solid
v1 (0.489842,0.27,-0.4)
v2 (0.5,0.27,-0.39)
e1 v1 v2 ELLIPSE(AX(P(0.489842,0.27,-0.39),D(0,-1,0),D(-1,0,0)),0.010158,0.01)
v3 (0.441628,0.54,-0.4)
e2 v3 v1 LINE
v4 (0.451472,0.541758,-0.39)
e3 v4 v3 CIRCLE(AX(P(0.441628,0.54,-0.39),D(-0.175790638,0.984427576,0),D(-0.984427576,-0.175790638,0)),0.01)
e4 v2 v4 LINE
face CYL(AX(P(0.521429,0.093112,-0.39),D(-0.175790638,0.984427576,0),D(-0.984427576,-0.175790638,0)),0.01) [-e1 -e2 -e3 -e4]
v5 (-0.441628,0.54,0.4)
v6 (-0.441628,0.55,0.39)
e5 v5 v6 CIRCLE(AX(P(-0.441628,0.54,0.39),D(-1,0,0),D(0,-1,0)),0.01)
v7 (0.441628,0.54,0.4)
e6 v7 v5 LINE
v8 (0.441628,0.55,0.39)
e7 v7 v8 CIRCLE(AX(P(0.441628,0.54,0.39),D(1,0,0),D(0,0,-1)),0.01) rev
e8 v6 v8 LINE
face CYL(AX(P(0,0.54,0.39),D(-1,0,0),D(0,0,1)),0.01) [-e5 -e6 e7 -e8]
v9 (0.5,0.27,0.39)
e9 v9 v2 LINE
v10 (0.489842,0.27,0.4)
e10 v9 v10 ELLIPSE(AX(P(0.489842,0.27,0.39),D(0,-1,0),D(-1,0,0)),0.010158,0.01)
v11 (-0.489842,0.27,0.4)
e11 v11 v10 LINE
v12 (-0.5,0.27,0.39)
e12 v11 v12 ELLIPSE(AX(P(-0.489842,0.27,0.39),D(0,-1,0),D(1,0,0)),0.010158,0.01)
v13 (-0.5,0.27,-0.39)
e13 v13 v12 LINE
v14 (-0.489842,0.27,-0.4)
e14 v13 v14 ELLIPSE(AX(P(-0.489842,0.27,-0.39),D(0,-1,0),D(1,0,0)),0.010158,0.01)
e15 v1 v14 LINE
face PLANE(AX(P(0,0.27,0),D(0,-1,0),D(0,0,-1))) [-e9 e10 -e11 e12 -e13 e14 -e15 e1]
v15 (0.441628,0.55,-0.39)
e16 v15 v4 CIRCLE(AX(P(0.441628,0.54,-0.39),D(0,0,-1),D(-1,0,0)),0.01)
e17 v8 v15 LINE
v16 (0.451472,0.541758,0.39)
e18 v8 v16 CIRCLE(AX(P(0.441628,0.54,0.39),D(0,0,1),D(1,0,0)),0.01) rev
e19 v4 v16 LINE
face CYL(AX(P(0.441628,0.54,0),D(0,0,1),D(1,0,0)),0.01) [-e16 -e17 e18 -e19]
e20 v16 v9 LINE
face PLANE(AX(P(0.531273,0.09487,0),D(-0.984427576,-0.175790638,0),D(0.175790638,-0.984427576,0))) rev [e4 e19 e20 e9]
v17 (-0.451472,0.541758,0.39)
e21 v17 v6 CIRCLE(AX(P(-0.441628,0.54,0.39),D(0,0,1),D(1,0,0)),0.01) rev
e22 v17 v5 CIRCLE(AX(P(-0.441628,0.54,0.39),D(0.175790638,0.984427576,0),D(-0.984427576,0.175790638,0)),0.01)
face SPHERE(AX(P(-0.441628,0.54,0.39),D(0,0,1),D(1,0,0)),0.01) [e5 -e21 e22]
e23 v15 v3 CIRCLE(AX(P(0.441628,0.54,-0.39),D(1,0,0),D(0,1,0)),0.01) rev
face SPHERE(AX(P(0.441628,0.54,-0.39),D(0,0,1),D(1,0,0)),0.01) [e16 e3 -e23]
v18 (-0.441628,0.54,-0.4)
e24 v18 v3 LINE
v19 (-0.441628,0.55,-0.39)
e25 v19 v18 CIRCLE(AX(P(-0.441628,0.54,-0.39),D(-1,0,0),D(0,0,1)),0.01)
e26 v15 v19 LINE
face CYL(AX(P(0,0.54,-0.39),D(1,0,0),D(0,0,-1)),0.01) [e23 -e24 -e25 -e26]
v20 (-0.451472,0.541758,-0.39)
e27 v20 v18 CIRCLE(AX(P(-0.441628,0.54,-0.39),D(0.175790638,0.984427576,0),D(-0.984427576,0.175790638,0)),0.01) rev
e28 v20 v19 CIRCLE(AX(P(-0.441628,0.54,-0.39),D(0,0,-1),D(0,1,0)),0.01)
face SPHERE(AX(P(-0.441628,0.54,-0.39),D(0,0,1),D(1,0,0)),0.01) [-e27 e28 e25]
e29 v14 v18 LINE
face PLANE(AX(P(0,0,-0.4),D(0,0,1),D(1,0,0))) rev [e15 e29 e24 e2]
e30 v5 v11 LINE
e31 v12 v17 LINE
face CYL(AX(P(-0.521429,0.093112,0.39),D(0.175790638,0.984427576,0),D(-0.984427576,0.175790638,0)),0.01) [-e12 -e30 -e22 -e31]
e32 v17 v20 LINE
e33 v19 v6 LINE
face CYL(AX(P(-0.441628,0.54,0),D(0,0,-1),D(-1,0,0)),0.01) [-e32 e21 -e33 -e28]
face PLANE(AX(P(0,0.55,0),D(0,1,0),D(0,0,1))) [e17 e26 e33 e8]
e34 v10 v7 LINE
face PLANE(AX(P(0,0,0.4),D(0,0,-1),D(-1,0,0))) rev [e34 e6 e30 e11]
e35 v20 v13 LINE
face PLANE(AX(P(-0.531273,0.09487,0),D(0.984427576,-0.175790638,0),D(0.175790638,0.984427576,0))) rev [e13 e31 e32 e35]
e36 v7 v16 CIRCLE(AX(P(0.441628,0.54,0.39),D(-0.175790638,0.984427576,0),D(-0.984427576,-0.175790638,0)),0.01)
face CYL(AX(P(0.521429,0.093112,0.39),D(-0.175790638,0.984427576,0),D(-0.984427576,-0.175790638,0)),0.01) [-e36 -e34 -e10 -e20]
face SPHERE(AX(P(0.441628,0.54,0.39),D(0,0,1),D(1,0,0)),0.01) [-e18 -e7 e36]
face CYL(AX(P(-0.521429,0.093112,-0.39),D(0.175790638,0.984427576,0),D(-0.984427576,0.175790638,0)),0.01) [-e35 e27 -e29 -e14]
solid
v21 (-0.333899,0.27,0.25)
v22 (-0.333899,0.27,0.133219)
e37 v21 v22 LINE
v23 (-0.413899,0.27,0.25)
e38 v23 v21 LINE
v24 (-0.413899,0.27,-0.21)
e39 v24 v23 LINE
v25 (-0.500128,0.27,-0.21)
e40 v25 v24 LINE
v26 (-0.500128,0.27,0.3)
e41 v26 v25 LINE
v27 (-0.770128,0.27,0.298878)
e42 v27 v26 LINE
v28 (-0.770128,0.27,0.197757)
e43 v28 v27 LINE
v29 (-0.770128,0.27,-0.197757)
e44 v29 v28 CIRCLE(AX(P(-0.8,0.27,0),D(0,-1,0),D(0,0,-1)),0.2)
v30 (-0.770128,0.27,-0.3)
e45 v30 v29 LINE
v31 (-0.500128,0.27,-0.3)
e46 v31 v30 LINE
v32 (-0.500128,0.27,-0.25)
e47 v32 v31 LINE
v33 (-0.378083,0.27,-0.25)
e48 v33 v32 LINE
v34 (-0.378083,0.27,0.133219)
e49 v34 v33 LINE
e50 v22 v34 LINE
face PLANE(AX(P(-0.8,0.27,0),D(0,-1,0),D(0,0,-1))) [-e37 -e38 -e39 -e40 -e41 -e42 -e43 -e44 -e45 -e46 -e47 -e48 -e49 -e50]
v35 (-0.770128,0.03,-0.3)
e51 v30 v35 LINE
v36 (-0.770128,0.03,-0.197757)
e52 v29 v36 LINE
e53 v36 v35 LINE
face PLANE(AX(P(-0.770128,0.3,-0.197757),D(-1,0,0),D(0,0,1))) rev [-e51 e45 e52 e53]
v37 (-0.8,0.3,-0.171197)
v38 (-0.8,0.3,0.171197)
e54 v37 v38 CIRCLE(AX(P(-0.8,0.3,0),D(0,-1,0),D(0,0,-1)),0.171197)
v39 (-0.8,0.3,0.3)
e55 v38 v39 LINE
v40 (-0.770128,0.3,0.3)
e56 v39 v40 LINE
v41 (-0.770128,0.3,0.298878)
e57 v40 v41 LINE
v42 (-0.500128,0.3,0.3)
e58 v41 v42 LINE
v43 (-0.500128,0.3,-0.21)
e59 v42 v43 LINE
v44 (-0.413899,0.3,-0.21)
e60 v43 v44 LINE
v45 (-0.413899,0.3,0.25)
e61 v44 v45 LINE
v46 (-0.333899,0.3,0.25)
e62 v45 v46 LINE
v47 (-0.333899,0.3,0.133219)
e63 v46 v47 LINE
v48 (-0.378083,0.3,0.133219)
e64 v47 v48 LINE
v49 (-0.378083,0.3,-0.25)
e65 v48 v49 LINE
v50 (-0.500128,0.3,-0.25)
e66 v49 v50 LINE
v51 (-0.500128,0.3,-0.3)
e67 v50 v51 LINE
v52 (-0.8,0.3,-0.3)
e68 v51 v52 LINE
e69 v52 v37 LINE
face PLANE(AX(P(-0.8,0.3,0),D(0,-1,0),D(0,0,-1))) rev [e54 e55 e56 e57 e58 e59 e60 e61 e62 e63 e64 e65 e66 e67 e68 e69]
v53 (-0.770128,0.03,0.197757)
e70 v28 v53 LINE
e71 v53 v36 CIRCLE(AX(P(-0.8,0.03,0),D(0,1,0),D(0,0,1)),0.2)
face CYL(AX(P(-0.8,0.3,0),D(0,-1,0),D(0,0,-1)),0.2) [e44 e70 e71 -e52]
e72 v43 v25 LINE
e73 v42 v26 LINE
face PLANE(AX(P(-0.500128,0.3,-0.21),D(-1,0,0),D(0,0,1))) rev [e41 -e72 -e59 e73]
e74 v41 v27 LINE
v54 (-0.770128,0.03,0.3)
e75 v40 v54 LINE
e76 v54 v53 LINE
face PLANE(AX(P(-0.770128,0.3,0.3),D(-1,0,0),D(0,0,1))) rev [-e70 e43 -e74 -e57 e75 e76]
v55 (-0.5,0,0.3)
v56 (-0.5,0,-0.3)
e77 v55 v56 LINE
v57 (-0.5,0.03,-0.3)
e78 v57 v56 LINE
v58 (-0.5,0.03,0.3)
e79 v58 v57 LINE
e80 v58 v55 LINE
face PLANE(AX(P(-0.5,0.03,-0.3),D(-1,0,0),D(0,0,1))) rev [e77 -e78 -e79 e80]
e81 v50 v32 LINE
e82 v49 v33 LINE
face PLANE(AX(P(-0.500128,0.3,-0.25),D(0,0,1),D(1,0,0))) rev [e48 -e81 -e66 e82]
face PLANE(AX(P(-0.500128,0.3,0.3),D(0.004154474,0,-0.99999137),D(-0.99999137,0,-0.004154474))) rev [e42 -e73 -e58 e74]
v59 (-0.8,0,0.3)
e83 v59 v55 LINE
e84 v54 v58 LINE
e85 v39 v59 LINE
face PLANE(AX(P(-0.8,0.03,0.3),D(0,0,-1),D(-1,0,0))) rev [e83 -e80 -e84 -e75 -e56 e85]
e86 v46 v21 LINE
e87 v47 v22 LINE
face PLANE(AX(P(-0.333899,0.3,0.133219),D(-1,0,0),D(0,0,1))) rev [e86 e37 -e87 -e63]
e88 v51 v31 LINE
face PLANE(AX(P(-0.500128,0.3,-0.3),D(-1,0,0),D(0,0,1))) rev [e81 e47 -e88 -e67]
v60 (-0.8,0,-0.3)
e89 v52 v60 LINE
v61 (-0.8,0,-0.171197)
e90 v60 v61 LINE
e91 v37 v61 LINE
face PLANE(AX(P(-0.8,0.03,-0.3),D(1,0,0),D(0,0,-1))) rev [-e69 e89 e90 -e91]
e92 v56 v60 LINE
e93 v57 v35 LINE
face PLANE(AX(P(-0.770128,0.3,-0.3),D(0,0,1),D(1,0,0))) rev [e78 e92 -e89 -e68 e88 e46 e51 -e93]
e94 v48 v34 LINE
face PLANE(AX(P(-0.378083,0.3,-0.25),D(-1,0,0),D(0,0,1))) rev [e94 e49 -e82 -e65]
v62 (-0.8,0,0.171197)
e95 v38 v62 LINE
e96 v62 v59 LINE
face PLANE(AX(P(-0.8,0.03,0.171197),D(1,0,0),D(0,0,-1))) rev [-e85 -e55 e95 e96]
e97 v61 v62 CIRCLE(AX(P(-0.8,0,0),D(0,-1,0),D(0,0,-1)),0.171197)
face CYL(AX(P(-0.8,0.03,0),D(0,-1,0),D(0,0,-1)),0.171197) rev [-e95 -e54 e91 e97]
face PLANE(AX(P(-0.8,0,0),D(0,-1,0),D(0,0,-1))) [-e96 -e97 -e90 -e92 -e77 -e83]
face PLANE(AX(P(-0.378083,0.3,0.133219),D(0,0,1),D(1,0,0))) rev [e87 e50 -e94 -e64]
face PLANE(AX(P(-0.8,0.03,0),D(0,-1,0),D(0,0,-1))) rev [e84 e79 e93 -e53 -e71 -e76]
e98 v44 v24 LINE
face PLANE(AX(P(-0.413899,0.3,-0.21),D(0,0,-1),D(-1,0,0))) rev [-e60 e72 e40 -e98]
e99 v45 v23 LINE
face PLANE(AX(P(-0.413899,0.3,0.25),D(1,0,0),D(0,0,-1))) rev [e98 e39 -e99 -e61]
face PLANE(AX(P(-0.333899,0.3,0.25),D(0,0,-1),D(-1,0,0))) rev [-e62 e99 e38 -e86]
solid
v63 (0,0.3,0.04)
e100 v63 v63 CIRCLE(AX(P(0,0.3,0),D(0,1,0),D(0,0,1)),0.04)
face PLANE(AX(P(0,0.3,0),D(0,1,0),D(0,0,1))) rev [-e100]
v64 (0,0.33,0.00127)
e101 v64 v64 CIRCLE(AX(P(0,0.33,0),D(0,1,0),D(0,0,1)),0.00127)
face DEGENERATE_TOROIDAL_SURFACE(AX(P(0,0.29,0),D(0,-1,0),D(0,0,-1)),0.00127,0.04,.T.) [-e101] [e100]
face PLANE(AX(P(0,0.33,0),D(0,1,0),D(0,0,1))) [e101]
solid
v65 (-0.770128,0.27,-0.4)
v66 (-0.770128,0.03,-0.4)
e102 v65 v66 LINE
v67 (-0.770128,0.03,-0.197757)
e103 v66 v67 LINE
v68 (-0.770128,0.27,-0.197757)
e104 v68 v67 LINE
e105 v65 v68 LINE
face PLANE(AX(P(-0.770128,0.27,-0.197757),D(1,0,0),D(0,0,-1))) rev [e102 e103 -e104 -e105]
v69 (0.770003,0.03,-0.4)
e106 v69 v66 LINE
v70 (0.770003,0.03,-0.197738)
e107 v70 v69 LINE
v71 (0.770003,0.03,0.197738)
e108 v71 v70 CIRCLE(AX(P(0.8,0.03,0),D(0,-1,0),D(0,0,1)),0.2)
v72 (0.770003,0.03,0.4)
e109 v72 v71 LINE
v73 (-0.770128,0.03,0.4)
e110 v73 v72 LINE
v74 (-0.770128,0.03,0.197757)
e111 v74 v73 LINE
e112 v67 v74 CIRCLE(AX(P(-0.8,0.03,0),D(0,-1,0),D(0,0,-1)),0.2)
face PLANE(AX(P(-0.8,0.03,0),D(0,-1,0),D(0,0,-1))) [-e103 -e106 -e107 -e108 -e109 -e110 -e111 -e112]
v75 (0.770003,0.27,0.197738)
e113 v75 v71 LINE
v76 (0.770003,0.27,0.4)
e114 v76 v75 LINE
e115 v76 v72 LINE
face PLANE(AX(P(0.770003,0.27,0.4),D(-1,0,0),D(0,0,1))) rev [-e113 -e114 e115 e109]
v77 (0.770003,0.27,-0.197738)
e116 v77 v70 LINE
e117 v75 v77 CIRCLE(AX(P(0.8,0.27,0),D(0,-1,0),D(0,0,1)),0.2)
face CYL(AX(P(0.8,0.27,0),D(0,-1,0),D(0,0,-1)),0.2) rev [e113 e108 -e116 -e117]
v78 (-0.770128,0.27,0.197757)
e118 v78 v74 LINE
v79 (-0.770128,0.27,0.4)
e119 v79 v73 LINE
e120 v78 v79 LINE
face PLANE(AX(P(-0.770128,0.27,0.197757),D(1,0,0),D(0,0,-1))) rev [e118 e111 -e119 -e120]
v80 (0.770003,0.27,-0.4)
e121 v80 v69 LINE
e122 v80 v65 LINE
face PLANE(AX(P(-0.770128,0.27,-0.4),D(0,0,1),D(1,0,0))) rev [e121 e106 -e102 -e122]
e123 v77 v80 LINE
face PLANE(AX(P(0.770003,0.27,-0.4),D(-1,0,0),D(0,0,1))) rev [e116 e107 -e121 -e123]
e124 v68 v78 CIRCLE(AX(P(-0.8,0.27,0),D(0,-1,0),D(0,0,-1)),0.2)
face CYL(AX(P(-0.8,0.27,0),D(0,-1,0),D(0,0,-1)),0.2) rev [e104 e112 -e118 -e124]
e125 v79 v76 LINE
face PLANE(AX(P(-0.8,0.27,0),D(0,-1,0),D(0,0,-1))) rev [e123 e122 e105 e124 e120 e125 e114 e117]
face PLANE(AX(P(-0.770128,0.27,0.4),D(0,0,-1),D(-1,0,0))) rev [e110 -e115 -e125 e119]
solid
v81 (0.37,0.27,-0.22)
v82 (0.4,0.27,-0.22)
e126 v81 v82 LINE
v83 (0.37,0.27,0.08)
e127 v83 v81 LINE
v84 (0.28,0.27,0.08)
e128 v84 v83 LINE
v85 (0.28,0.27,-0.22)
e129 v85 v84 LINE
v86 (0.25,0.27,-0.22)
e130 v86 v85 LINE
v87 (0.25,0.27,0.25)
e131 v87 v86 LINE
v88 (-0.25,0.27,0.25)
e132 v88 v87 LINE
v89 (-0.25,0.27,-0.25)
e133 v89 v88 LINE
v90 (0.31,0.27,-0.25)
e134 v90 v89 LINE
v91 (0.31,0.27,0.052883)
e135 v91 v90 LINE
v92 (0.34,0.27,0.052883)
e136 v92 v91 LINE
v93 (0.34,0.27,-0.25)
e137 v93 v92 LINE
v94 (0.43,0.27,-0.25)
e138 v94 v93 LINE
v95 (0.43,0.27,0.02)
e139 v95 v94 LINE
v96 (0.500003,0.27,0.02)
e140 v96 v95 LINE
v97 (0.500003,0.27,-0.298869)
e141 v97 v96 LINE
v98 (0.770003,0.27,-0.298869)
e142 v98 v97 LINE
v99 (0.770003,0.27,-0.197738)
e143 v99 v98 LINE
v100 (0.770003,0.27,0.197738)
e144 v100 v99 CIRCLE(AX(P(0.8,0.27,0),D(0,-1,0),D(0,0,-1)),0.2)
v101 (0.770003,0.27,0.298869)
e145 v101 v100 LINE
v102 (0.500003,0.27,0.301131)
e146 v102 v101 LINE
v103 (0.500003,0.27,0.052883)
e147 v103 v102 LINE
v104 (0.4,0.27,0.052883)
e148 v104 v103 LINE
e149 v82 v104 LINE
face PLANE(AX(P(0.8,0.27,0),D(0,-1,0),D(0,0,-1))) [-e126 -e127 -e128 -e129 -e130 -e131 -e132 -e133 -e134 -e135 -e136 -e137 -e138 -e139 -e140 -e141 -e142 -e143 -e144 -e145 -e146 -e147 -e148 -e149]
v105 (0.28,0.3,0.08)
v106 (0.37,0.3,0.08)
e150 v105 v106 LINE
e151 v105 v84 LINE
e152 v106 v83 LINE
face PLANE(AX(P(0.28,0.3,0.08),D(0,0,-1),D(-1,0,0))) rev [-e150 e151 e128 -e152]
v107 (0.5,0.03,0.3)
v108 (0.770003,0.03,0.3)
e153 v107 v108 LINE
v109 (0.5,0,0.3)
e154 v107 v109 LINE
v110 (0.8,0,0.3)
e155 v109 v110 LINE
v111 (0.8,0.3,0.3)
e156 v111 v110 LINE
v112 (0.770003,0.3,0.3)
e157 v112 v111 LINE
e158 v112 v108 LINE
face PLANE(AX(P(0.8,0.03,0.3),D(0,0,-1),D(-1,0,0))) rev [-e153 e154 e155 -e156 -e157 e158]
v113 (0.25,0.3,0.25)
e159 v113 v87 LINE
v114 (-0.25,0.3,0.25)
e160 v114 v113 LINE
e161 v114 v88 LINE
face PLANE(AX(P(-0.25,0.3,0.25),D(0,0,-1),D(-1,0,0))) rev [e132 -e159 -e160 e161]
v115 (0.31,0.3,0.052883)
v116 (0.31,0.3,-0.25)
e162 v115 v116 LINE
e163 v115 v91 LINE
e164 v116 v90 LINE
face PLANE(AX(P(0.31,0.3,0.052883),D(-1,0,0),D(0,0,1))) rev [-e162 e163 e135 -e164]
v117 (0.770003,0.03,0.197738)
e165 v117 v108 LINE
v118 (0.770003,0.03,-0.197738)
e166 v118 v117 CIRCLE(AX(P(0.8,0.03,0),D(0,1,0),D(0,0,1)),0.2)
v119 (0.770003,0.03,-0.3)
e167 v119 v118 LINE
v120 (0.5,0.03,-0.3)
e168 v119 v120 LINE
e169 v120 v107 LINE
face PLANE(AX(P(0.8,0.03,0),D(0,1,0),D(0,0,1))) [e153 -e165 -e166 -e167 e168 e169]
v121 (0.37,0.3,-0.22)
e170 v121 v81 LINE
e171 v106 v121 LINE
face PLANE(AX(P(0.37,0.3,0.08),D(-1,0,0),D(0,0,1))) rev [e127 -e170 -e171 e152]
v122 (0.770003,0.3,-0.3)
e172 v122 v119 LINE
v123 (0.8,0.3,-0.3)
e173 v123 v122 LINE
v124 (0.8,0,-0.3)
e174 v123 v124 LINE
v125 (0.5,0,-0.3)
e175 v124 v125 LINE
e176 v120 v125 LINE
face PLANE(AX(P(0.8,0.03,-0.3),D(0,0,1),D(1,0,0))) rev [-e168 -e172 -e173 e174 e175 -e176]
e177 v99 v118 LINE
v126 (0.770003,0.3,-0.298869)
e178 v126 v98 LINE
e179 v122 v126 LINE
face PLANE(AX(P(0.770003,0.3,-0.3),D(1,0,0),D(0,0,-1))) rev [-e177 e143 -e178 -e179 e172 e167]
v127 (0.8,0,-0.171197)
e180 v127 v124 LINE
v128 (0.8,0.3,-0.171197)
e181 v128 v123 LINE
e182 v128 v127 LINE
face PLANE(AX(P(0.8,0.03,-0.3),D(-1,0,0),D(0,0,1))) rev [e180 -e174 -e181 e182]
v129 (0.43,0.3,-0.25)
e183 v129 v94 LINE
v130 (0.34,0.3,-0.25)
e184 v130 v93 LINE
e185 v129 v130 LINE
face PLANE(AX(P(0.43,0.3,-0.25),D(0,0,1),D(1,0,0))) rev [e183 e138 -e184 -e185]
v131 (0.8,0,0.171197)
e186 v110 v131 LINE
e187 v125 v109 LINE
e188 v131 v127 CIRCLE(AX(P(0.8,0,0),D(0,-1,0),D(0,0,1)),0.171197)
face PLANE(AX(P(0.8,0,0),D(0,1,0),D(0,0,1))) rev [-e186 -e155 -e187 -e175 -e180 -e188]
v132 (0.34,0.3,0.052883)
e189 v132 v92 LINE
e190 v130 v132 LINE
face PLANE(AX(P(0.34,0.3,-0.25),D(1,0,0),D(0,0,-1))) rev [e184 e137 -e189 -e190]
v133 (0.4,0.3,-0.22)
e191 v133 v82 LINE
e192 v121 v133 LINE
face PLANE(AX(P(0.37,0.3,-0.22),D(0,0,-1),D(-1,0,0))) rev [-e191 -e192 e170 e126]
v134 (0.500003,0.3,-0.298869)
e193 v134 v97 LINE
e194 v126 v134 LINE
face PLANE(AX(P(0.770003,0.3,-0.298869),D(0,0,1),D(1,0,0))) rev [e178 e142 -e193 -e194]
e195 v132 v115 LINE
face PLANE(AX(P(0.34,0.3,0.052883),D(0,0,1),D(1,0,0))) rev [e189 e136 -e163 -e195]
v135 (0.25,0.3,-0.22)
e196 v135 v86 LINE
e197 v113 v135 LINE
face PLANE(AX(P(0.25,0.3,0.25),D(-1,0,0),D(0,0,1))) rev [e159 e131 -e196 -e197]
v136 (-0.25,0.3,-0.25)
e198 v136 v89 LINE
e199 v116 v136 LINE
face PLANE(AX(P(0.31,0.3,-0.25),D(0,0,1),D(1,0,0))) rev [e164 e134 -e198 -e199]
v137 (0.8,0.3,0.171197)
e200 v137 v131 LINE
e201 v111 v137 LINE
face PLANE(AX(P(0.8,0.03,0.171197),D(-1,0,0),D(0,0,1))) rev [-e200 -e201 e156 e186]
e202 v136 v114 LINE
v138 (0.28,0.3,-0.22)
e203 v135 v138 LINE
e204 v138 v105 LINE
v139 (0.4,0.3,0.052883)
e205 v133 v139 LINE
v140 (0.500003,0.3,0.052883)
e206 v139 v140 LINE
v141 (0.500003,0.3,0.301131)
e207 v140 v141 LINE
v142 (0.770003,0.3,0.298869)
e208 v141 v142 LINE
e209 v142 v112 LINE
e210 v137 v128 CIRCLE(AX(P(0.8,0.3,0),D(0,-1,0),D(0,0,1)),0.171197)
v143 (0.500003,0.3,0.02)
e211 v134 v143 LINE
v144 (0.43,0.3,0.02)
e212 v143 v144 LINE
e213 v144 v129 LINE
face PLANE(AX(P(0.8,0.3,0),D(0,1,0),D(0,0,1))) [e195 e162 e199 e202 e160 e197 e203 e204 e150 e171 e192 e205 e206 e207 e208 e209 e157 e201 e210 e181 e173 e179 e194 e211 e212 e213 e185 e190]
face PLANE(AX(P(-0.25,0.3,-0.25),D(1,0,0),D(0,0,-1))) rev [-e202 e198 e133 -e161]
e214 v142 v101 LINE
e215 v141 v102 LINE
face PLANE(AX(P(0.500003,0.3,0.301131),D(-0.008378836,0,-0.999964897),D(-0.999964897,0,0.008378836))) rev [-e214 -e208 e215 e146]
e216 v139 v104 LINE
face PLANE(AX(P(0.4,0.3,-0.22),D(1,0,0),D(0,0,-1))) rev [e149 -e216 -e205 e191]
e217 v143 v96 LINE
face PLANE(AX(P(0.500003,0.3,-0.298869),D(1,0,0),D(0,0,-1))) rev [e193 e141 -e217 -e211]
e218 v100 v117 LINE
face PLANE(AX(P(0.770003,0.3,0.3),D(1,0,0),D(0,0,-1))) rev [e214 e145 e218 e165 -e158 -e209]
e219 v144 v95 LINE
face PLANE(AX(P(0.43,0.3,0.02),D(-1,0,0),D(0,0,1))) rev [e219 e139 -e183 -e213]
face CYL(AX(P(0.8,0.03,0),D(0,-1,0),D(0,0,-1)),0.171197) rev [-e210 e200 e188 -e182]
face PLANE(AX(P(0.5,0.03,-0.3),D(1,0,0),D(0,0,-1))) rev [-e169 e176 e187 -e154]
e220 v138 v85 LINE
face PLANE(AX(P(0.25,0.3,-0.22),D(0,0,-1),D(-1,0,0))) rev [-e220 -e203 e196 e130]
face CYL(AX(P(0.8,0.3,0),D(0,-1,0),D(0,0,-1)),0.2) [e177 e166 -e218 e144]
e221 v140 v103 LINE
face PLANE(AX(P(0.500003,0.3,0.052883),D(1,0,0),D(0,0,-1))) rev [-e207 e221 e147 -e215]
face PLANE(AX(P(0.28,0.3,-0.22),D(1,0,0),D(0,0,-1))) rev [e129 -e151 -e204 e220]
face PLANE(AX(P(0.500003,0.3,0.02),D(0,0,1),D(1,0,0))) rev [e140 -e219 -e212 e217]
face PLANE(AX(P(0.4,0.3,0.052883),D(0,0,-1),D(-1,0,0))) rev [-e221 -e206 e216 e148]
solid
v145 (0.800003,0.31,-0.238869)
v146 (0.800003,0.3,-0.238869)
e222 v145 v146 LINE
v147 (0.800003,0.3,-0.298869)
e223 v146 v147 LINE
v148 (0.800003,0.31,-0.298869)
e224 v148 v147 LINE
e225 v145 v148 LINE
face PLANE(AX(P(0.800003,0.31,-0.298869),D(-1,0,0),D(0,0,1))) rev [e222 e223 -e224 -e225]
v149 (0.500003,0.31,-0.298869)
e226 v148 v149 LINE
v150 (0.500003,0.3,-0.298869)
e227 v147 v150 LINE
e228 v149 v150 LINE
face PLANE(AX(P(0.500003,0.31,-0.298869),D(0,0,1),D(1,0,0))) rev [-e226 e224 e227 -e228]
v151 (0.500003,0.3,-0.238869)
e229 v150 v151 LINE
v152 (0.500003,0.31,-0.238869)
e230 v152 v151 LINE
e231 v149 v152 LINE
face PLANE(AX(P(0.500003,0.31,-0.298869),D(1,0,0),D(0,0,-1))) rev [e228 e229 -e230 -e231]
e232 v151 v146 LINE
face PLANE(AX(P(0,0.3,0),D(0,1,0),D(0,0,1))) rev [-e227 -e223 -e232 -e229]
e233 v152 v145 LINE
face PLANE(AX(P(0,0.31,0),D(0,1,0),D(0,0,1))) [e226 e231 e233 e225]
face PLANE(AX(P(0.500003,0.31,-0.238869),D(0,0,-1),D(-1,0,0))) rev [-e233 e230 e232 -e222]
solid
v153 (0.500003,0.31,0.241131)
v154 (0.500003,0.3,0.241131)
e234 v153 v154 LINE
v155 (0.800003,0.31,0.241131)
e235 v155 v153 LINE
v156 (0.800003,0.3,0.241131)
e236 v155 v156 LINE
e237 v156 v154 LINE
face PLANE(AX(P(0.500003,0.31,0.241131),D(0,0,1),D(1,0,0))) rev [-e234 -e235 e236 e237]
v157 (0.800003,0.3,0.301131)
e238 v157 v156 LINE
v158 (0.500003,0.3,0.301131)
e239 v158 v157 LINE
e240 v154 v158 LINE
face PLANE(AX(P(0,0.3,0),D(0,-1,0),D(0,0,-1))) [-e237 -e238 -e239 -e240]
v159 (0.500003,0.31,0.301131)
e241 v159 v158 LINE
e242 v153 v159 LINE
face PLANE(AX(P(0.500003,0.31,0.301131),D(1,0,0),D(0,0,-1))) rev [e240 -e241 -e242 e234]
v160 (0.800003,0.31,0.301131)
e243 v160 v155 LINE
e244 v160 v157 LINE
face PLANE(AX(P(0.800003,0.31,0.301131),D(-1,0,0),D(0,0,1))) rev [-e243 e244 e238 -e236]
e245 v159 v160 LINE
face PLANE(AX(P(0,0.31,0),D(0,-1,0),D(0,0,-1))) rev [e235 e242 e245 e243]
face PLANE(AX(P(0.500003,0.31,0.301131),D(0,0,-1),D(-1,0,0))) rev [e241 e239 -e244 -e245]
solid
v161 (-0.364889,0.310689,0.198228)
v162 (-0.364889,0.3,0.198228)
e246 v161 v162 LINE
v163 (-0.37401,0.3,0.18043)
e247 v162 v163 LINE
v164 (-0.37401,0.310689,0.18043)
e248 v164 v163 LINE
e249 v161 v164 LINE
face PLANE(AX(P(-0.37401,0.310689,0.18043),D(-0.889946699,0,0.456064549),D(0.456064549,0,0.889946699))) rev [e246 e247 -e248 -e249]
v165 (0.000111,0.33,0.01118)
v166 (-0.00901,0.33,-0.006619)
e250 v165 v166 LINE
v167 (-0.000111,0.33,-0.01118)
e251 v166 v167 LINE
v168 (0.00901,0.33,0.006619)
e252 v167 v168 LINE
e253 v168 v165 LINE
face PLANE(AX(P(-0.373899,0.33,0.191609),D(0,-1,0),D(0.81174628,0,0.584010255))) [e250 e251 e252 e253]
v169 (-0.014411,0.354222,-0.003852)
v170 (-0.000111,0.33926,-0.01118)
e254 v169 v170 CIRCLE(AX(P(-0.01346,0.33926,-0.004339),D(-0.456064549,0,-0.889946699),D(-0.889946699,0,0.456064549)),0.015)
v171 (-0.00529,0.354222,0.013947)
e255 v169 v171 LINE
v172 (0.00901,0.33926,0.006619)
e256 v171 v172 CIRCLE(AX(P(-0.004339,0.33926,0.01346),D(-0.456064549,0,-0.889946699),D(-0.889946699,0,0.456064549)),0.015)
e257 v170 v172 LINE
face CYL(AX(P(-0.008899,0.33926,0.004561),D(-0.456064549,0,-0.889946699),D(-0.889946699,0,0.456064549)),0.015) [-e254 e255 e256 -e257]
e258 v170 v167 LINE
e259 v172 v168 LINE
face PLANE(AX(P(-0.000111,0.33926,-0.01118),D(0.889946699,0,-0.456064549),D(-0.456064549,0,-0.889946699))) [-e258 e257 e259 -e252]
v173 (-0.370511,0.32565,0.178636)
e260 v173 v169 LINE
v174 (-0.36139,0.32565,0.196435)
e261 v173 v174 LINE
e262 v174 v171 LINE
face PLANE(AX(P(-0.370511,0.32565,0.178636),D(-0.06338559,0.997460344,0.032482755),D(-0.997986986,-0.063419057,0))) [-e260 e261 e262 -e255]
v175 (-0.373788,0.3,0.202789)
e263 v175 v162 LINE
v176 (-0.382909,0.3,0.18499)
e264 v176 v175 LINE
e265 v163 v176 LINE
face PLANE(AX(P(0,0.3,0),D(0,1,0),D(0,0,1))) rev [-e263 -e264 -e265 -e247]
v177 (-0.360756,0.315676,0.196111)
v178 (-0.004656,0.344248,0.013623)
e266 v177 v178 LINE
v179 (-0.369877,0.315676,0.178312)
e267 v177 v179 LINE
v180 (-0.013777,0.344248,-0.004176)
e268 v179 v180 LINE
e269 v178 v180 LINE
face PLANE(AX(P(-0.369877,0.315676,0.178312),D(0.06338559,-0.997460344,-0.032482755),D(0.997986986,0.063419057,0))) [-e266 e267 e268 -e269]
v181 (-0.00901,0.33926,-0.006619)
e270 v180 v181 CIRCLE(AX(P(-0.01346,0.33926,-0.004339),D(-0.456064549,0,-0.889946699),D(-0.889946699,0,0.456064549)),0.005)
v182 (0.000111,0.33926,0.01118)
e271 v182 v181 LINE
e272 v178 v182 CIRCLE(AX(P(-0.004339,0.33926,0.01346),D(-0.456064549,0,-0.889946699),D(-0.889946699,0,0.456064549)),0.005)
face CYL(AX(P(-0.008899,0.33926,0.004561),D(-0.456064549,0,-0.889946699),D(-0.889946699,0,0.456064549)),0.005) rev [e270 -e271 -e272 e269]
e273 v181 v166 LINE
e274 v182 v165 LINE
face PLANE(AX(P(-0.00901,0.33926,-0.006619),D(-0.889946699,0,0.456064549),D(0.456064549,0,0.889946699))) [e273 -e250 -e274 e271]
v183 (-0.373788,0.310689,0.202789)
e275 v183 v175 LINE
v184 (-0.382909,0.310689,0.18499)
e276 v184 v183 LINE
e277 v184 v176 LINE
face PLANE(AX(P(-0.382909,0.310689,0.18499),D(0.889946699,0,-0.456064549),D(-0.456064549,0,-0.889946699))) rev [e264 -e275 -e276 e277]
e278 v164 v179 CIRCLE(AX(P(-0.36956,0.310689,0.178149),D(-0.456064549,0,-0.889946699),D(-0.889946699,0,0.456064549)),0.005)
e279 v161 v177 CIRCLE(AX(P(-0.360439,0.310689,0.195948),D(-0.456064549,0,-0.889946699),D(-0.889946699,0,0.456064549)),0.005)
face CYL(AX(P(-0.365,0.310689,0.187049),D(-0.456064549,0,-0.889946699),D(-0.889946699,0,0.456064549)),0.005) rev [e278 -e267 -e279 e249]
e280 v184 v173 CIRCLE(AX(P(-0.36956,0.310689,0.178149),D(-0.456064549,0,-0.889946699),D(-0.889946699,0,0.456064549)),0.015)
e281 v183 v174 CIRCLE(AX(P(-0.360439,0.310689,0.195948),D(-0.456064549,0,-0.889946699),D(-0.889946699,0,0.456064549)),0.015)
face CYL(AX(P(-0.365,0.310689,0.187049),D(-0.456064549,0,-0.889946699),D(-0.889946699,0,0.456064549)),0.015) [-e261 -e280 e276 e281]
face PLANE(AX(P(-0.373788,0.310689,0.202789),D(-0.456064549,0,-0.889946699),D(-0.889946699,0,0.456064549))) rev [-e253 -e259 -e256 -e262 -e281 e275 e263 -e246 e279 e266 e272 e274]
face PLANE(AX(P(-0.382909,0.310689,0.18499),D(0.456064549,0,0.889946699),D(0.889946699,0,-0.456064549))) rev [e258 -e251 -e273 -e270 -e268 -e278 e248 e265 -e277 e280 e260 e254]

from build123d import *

# Parameters (mm, degrees)
EXTRUDE_1_DEPTH   = 0.03
EXTRUDE_1_2_DEPTH = 0.03
EXTRUDE_2_DEPTH   = 0.27
EXTRUDE_3_DEPTH   = 0.24
EXTRUDE_4_DEPTH   = 0.03
EXTRUDE_4_2_DEPTH = 0.03
SKETCH_9_R        = 0.04
EXTRUDE_5_DEPTH   = 0.03
FILLET_1_R        = 0.04
FILLET_2_R        = 0.01
SKETCH_18_W       = 0.3
SKETCH_18_H       = 0.06
EXTRUDE_8_DEPTH   = 0.01
EXTRUDE_8_2_DEPTH = 0.01


with BuildPart() as part:
    # Эскиз1 → Бобышка-Вытянуть1 (new body)
    with BuildSketch(Plane(origin=(0, 0, 0), x_dir=(1, 0, 0), z_dir=(0, 1, 0))):
        with BuildLine():
            Line((-0.8, 0.3), (-0.8, 0.171196845))
            ThreePointArc((-0.8, 0.171196845), (-0.628803155, 0), (-0.8, -0.171196845))
            Line((-0.8, -0.171196845), (-0.8, -0.3))
            Line((-0.8, -0.3), (-0.5, -0.3))
            Line((-0.5, -0.3), (-0.5, 0.3))
            Line((-0.5, 0.3), (-0.8, 0.3))
        make_face()
    extrude(amount=EXTRUDE_1_DEPTH)



with BuildPart() as body_2:
    # Эскиз1 → Extrude 1 2 (new body)
    with BuildSketch(Plane(origin=(0, 0, 0), x_dir=(1, 0, 0), z_dir=(0, 1, 0))):
        with BuildLine():
            Line((0.8, 0.3), (0.5, 0.3))
            Line((0.5, 0.3), (0.5, -0.3))
            Line((0.5, -0.3), (0.8, -0.3))
            Line((0.8, -0.3), (0.8, -0.171196845))
            ThreePointArc((0.8, -0.171196845), (0.628803155, 0), (0.8, 0.171196845))
            Line((0.8, 0.171196845), (0.8, 0.3))
        make_face()
    extrude(amount=EXTRUDE_1_2_DEPTH)


with BuildPart() as part_1:
    add(part.part)

    add(body_2.part)  # Бобышка-Вытянуть2 merges body 2
    # Эскиз2 → Бобышка-Вытянуть2 (add)
    with BuildSketch(Plane(origin=(0, 0.03, 0), x_dir=(1, 0, 0), z_dir=(0, 1, 0))):
        with BuildLine():
            Line((-0.8, 0.171196845), (-0.8, 0.3))
            Line((-0.8, 0.3), (-0.770127922, 0.3))
            Line((-0.770127922, 0.3), (-0.770127922, 0.197756565))
            ThreePointArc((-0.770127922, 0.197756565), (-0.6, 0), (-0.770127922, -0.197756565))
            Line((-0.770127922, -0.197756565), (-0.770127922, -0.3))
            Line((-0.770127922, -0.3), (-0.8, -0.3))
            Line((-0.8, -0.3), (-0.8, -0.171196845))
            ThreePointArc((-0.8, -0.171196845), (-0.628803155, 0), (-0.8, 0.171196845))
        make_face()
        with BuildLine():
            Line((0.8, 0.171196845), (0.8, 0.3))
            Line((0.8, 0.3), (0.770002872, 0.3))
            Line((0.770002872, 0.3), (0.770002872, 0.197737635))
            ThreePointArc((0.770002872, 0.197737635), (0.6, 0), (0.770002872, -0.197737635))
            Line((0.770002872, -0.197737635), (0.770002872, -0.3))
            Line((0.770002872, -0.3), (0.8, -0.3))
            Line((0.8, -0.3), (0.8, -0.171196845))
            ThreePointArc((0.8, -0.171196845), (0.628803155, 0), (0.8, 0.171196845))
        make_face()
    extrude(amount=EXTRUDE_2_DEPTH)


with BuildPart() as body_2_2:
    # Эскиз3 → Бобышка-Вытянуть3 (new body)
    with BuildSketch(Plane(origin=(0, 0.03, 0), x_dir=(1, 0, 0), z_dir=(0, 1, 0))):
        with BuildLine():
            Line((-0.770127922, 0.197756565), (-0.770127922, 0.4))
            Line((-0.770127922, 0.4), (0.770002872, 0.4))
            Line((0.770002872, 0.4), (0.770002872, 0.197737635))
            ThreePointArc((0.770002872, 0.197737635), (0.6, 0), (0.770002872, -0.197737635))
            Line((0.770002872, -0.197737635), (0.770002872, -0.4))
            Line((0.770002872, -0.4), (-0.770127922, -0.4))
            Line((-0.770127922, -0.4), (-0.770127922, -0.197756565))
            ThreePointArc((-0.770127922, -0.197756565), (-0.6, 0), (-0.770127922, 0.197756565))
        make_face()
    extrude(amount=EXTRUDE_3_DEPTH)


with BuildPart() as body_3:
    # Эскиз4 → Бобышка-Вытянуть4 (new body)
    with BuildSketch(Plane(origin=(0, 0.27, 0), x_dir=(1, 0, 0), z_dir=(0, 1, 0))):
        with BuildLine():
            Line((-0.770127922, 0.197756565), (-0.770127922, 0.3))
            Line((-0.770127922, 0.3), (-0.500127922, 0.3))
            Line((-0.500127922, 0.3), (-0.500127922, 0.25))
            Line((-0.500127922, 0.25), (-0.378083422, 0.25))
            Line((-0.378083422, 0.25), (-0.378083422, -0.133218672))
            Line((-0.378083422, -0.133218672), (-0.333899038, -0.133218672))
            Line((-0.333899038, -0.133218672), (-0.333899038, -0.25))
            Line((-0.333899038, -0.25), (-0.413899038, -0.25))
            Line((-0.413899038, -0.25), (-0.413899038, 0.21))
            Line((-0.413899038, 0.21), (-0.500127922, 0.21))
            Line((-0.500127922, 0.21), (-0.500127922, -0.3))
            Line((-0.500127922, -0.3), (-0.770127922, -0.298878282))
            Line((-0.770127922, -0.298878282), (-0.770127922, -0.197756565))
            ThreePointArc((-0.770127922, -0.197756565), (-0.6, 0), (-0.770127922, 0.197756565))
        make_face()
    extrude(amount=EXTRUDE_4_DEPTH)


with BuildPart() as body_4:
    # Эскиз4 → Extrude 4 2 (new body)
    with BuildSketch(Plane(origin=(0, 0.27, 0), x_dir=(1, 0, 0), z_dir=(0, 1, 0))):
        with BuildLine():
            Line((0.770002872, 0.197737635), (0.770002872, 0.298868817))
            Line((0.770002872, 0.298868817), (0.500002872, 0.298868817))
            Line((0.500002872, 0.298868817), (0.500002872, -0.02))
            Line((0.500002872, -0.02), (0.43, -0.02))
            Line((0.43, -0.02), (0.43, 0.25))
            Line((0.43, 0.25), (0.34, 0.25))
            Line((0.34, 0.25), (0.34, -0.052883428))
            Line((0.34, -0.052883428), (0.31, -0.052883428))
            Line((0.31, -0.052883428), (0.31, 0.25))
            Line((0.31, 0.25), (-0.25, 0.25))
            Line((-0.25, 0.25), (-0.25, -0.25))
            Line((-0.25, -0.25), (0.25, -0.25))
            Line((0.25, -0.25), (0.25, 0.22))
            Line((0.25, 0.22), (0.28, 0.22))
            Line((0.28, 0.22), (0.28, -0.08))
            Line((0.28, -0.08), (0.37, -0.08))
            Line((0.37, -0.08), (0.37, 0.22))
            Line((0.37, 0.22), (0.4, 0.22))
            Line((0.4, 0.22), (0.4, -0.052883428))
            Line((0.4, -0.052883428), (0.500002872, -0.052883428))
            Line((0.500002872, -0.052883428), (0.500002872, -0.301131183))
            Line((0.500002872, -0.301131183), (0.770002872, -0.298868817))
            Line((0.770002872, -0.298868817), (0.770002872, -0.197737635))
            ThreePointArc((0.770002872, -0.197737635), (0.6, 0), (0.770002872, 0.197737635))
        make_face()
    extrude(amount=EXTRUDE_4_2_DEPTH)


with BuildPart() as body_5:
    # Эскиз9 → Бобышка-Вытянуть5 (new body)
    with BuildSketch(Plane(origin=(0, 0.3, 0), x_dir=(1, 0, 0), z_dir=(0, 1, 0))):
        with Locations(Location((0, 0, 0), (0, 0, 270))):
            Circle(SKETCH_9_R)
    extrude(amount=EXTRUDE_5_DEPTH)

    # Скругление1
    # the kernel refuses this fillet: 0.04 mm, written as the material it takes off along each edge
    with BuildSketch(Plane(origin=(0, 0.33, 0), x_dir=(0, 0, 1), z_dir=(-1, 0, 0))) as fillet_1_piece_1:
        with BuildLine():
            CenterArc((0.001270167, -0.04), FILLET_1_R, 14.477512185, 75.522487815)
            Line((0.001270167, 0), (0.001270167, 0.0008))
            Line((0.001270167, 0.0008), (0.04, 0.0008))
            Line((0.04, 0.0008), (0.0408, 0))
            ThreePointArc((0.0408, 0), (0.0408, -0.015), (0.040774597, -0.0298))
            Line((0.040774597, -0.0298), (0.04, -0.03))
        make_face()
    revolve(axis=Axis((0, 0.33, 0), (0, 1, 0)), mode=Mode.SUBTRACT)


with BuildPart() as body_6:
    # По траектории1: sweep along a path in Эскиз11
    with BuildLine(Plane(origin=(0, 0, 0), x_dir=(-0.8899466991308816, 0, 0.4560645488371663), z_dir=(-0.4560645488371663, 0, -0.8899466991308816))) as sweep_1_path:
        Line((0.42013644, 0.3), (0.42013644, 0.310688593))
        ThreePointArc((0.42013644, 0.310688593), (0.417454992, 0.317503194), (0.41084868, 0.320663196))
        Line((0.41084868, 0.320663196), (0.01071224, 0.349235088))
        ThreePointArc((0.01071224, 0.349235088), (0.003185398, 0.346579037), (0, 0.339260485))
        Line((0, 0.339260485), (0, 0.33))
    # Эскиз14 → По траектории1 (sweep)
    with BuildSketch(Plane(origin=(0, 0.3, 0), x_dir=(1, 0, 0), z_dir=(0, 1, 0))):
        Polygon((-0.382909417, -0.184990192), (-0.37400995, -0.180429546), (-0.364888659, -0.19822848), (-0.373788126, -0.202789126), align=None)
    sweep(path=sweep_1_path.line)


with BuildPart() as body_7:
    # Эскиз5 → По сечениям1 section 0
    with BuildSketch(Plane(origin=(0, 0.27, 0), x_dir=(1, 0, 0), z_dir=(0, 1, 0))):
        with BuildLine():
            Line((-0.5, -0.4), (0.5, -0.4))
            Line((0.5, -0.4), (0.5, 0.4))
            Line((0.5, 0.4), (-0.5, 0.4))
            Line((-0.5, 0.4), (-0.5, -0.4))
        make_face()
    # Эскиз17 → По сечениям1 section 1
    with BuildSketch(Plane(origin=(0, 0.55, 0), x_dir=(1, 0, 0), z_dir=(0, 1, 0))):
        with BuildLine():
            Line((-0.45, 0.4), (0.45, 0.4))
            Line((0.45, 0.4), (0.45, -0.4))
            Line((0.45, -0.4), (-0.45, -0.4))
            Line((-0.45, -0.4), (-0.45, 0.4))
        make_face()
    loft()

    # Скругление2
    fillet_2_edges = [body_7.edges().sort_by_distance(p)[0] for p in [
        (-0.475, 0.41, -0.4),
        (0.475, 0.41, -0.4),
        (0.475, 0.41, 0.4),
        (-0.475, 0.41, 0.4),
        (-0.45, 0.55, 0),
        (0, 0.55, -0.4),
        (0.45, 0.55, 0),
        (0, 0.55, 0.4),
    ]]
    fillet(fillet_2_edges, radius=FILLET_2_R)


with BuildPart() as body_8:
    # Эскиз18 → Бобышка-Вытянуть8 (new body)
    with BuildSketch(Plane(origin=(0, 0.3, 0), x_dir=(1, 0, 0), z_dir=(0, 1, 0))):
        with Locations((0.650002872, 0.268868817)):
            Rectangle(SKETCH_18_W, SKETCH_18_H)
    extrude(amount=EXTRUDE_8_DEPTH)


with BuildPart() as body_9:
    # Эскиз18 → Extrude 8 2 (new body)
    with BuildSketch(Plane(origin=(0, 0.3, 0), x_dir=(1, 0, 0), z_dir=(0, 1, 0))):
        with Locations((0.650002872, -0.271131183)):
            Rectangle(SKETCH_18_W, SKETCH_18_H)
    extrude(amount=EXTRUDE_8_2_DEPTH)


with BuildPart() as part_2:
    add(part_1.part)

    # Combine 5: union body 4
    add(body_4.part)


with BuildPart() as body_3_1:
    add(body_3.part)

    # Combine 6: union part
    add(part_2.part)


solid = Compound([body_2_2.part, body_5.part, body_6.part, body_7.part, body_8.part, body_9.part, body_3_1.part])
